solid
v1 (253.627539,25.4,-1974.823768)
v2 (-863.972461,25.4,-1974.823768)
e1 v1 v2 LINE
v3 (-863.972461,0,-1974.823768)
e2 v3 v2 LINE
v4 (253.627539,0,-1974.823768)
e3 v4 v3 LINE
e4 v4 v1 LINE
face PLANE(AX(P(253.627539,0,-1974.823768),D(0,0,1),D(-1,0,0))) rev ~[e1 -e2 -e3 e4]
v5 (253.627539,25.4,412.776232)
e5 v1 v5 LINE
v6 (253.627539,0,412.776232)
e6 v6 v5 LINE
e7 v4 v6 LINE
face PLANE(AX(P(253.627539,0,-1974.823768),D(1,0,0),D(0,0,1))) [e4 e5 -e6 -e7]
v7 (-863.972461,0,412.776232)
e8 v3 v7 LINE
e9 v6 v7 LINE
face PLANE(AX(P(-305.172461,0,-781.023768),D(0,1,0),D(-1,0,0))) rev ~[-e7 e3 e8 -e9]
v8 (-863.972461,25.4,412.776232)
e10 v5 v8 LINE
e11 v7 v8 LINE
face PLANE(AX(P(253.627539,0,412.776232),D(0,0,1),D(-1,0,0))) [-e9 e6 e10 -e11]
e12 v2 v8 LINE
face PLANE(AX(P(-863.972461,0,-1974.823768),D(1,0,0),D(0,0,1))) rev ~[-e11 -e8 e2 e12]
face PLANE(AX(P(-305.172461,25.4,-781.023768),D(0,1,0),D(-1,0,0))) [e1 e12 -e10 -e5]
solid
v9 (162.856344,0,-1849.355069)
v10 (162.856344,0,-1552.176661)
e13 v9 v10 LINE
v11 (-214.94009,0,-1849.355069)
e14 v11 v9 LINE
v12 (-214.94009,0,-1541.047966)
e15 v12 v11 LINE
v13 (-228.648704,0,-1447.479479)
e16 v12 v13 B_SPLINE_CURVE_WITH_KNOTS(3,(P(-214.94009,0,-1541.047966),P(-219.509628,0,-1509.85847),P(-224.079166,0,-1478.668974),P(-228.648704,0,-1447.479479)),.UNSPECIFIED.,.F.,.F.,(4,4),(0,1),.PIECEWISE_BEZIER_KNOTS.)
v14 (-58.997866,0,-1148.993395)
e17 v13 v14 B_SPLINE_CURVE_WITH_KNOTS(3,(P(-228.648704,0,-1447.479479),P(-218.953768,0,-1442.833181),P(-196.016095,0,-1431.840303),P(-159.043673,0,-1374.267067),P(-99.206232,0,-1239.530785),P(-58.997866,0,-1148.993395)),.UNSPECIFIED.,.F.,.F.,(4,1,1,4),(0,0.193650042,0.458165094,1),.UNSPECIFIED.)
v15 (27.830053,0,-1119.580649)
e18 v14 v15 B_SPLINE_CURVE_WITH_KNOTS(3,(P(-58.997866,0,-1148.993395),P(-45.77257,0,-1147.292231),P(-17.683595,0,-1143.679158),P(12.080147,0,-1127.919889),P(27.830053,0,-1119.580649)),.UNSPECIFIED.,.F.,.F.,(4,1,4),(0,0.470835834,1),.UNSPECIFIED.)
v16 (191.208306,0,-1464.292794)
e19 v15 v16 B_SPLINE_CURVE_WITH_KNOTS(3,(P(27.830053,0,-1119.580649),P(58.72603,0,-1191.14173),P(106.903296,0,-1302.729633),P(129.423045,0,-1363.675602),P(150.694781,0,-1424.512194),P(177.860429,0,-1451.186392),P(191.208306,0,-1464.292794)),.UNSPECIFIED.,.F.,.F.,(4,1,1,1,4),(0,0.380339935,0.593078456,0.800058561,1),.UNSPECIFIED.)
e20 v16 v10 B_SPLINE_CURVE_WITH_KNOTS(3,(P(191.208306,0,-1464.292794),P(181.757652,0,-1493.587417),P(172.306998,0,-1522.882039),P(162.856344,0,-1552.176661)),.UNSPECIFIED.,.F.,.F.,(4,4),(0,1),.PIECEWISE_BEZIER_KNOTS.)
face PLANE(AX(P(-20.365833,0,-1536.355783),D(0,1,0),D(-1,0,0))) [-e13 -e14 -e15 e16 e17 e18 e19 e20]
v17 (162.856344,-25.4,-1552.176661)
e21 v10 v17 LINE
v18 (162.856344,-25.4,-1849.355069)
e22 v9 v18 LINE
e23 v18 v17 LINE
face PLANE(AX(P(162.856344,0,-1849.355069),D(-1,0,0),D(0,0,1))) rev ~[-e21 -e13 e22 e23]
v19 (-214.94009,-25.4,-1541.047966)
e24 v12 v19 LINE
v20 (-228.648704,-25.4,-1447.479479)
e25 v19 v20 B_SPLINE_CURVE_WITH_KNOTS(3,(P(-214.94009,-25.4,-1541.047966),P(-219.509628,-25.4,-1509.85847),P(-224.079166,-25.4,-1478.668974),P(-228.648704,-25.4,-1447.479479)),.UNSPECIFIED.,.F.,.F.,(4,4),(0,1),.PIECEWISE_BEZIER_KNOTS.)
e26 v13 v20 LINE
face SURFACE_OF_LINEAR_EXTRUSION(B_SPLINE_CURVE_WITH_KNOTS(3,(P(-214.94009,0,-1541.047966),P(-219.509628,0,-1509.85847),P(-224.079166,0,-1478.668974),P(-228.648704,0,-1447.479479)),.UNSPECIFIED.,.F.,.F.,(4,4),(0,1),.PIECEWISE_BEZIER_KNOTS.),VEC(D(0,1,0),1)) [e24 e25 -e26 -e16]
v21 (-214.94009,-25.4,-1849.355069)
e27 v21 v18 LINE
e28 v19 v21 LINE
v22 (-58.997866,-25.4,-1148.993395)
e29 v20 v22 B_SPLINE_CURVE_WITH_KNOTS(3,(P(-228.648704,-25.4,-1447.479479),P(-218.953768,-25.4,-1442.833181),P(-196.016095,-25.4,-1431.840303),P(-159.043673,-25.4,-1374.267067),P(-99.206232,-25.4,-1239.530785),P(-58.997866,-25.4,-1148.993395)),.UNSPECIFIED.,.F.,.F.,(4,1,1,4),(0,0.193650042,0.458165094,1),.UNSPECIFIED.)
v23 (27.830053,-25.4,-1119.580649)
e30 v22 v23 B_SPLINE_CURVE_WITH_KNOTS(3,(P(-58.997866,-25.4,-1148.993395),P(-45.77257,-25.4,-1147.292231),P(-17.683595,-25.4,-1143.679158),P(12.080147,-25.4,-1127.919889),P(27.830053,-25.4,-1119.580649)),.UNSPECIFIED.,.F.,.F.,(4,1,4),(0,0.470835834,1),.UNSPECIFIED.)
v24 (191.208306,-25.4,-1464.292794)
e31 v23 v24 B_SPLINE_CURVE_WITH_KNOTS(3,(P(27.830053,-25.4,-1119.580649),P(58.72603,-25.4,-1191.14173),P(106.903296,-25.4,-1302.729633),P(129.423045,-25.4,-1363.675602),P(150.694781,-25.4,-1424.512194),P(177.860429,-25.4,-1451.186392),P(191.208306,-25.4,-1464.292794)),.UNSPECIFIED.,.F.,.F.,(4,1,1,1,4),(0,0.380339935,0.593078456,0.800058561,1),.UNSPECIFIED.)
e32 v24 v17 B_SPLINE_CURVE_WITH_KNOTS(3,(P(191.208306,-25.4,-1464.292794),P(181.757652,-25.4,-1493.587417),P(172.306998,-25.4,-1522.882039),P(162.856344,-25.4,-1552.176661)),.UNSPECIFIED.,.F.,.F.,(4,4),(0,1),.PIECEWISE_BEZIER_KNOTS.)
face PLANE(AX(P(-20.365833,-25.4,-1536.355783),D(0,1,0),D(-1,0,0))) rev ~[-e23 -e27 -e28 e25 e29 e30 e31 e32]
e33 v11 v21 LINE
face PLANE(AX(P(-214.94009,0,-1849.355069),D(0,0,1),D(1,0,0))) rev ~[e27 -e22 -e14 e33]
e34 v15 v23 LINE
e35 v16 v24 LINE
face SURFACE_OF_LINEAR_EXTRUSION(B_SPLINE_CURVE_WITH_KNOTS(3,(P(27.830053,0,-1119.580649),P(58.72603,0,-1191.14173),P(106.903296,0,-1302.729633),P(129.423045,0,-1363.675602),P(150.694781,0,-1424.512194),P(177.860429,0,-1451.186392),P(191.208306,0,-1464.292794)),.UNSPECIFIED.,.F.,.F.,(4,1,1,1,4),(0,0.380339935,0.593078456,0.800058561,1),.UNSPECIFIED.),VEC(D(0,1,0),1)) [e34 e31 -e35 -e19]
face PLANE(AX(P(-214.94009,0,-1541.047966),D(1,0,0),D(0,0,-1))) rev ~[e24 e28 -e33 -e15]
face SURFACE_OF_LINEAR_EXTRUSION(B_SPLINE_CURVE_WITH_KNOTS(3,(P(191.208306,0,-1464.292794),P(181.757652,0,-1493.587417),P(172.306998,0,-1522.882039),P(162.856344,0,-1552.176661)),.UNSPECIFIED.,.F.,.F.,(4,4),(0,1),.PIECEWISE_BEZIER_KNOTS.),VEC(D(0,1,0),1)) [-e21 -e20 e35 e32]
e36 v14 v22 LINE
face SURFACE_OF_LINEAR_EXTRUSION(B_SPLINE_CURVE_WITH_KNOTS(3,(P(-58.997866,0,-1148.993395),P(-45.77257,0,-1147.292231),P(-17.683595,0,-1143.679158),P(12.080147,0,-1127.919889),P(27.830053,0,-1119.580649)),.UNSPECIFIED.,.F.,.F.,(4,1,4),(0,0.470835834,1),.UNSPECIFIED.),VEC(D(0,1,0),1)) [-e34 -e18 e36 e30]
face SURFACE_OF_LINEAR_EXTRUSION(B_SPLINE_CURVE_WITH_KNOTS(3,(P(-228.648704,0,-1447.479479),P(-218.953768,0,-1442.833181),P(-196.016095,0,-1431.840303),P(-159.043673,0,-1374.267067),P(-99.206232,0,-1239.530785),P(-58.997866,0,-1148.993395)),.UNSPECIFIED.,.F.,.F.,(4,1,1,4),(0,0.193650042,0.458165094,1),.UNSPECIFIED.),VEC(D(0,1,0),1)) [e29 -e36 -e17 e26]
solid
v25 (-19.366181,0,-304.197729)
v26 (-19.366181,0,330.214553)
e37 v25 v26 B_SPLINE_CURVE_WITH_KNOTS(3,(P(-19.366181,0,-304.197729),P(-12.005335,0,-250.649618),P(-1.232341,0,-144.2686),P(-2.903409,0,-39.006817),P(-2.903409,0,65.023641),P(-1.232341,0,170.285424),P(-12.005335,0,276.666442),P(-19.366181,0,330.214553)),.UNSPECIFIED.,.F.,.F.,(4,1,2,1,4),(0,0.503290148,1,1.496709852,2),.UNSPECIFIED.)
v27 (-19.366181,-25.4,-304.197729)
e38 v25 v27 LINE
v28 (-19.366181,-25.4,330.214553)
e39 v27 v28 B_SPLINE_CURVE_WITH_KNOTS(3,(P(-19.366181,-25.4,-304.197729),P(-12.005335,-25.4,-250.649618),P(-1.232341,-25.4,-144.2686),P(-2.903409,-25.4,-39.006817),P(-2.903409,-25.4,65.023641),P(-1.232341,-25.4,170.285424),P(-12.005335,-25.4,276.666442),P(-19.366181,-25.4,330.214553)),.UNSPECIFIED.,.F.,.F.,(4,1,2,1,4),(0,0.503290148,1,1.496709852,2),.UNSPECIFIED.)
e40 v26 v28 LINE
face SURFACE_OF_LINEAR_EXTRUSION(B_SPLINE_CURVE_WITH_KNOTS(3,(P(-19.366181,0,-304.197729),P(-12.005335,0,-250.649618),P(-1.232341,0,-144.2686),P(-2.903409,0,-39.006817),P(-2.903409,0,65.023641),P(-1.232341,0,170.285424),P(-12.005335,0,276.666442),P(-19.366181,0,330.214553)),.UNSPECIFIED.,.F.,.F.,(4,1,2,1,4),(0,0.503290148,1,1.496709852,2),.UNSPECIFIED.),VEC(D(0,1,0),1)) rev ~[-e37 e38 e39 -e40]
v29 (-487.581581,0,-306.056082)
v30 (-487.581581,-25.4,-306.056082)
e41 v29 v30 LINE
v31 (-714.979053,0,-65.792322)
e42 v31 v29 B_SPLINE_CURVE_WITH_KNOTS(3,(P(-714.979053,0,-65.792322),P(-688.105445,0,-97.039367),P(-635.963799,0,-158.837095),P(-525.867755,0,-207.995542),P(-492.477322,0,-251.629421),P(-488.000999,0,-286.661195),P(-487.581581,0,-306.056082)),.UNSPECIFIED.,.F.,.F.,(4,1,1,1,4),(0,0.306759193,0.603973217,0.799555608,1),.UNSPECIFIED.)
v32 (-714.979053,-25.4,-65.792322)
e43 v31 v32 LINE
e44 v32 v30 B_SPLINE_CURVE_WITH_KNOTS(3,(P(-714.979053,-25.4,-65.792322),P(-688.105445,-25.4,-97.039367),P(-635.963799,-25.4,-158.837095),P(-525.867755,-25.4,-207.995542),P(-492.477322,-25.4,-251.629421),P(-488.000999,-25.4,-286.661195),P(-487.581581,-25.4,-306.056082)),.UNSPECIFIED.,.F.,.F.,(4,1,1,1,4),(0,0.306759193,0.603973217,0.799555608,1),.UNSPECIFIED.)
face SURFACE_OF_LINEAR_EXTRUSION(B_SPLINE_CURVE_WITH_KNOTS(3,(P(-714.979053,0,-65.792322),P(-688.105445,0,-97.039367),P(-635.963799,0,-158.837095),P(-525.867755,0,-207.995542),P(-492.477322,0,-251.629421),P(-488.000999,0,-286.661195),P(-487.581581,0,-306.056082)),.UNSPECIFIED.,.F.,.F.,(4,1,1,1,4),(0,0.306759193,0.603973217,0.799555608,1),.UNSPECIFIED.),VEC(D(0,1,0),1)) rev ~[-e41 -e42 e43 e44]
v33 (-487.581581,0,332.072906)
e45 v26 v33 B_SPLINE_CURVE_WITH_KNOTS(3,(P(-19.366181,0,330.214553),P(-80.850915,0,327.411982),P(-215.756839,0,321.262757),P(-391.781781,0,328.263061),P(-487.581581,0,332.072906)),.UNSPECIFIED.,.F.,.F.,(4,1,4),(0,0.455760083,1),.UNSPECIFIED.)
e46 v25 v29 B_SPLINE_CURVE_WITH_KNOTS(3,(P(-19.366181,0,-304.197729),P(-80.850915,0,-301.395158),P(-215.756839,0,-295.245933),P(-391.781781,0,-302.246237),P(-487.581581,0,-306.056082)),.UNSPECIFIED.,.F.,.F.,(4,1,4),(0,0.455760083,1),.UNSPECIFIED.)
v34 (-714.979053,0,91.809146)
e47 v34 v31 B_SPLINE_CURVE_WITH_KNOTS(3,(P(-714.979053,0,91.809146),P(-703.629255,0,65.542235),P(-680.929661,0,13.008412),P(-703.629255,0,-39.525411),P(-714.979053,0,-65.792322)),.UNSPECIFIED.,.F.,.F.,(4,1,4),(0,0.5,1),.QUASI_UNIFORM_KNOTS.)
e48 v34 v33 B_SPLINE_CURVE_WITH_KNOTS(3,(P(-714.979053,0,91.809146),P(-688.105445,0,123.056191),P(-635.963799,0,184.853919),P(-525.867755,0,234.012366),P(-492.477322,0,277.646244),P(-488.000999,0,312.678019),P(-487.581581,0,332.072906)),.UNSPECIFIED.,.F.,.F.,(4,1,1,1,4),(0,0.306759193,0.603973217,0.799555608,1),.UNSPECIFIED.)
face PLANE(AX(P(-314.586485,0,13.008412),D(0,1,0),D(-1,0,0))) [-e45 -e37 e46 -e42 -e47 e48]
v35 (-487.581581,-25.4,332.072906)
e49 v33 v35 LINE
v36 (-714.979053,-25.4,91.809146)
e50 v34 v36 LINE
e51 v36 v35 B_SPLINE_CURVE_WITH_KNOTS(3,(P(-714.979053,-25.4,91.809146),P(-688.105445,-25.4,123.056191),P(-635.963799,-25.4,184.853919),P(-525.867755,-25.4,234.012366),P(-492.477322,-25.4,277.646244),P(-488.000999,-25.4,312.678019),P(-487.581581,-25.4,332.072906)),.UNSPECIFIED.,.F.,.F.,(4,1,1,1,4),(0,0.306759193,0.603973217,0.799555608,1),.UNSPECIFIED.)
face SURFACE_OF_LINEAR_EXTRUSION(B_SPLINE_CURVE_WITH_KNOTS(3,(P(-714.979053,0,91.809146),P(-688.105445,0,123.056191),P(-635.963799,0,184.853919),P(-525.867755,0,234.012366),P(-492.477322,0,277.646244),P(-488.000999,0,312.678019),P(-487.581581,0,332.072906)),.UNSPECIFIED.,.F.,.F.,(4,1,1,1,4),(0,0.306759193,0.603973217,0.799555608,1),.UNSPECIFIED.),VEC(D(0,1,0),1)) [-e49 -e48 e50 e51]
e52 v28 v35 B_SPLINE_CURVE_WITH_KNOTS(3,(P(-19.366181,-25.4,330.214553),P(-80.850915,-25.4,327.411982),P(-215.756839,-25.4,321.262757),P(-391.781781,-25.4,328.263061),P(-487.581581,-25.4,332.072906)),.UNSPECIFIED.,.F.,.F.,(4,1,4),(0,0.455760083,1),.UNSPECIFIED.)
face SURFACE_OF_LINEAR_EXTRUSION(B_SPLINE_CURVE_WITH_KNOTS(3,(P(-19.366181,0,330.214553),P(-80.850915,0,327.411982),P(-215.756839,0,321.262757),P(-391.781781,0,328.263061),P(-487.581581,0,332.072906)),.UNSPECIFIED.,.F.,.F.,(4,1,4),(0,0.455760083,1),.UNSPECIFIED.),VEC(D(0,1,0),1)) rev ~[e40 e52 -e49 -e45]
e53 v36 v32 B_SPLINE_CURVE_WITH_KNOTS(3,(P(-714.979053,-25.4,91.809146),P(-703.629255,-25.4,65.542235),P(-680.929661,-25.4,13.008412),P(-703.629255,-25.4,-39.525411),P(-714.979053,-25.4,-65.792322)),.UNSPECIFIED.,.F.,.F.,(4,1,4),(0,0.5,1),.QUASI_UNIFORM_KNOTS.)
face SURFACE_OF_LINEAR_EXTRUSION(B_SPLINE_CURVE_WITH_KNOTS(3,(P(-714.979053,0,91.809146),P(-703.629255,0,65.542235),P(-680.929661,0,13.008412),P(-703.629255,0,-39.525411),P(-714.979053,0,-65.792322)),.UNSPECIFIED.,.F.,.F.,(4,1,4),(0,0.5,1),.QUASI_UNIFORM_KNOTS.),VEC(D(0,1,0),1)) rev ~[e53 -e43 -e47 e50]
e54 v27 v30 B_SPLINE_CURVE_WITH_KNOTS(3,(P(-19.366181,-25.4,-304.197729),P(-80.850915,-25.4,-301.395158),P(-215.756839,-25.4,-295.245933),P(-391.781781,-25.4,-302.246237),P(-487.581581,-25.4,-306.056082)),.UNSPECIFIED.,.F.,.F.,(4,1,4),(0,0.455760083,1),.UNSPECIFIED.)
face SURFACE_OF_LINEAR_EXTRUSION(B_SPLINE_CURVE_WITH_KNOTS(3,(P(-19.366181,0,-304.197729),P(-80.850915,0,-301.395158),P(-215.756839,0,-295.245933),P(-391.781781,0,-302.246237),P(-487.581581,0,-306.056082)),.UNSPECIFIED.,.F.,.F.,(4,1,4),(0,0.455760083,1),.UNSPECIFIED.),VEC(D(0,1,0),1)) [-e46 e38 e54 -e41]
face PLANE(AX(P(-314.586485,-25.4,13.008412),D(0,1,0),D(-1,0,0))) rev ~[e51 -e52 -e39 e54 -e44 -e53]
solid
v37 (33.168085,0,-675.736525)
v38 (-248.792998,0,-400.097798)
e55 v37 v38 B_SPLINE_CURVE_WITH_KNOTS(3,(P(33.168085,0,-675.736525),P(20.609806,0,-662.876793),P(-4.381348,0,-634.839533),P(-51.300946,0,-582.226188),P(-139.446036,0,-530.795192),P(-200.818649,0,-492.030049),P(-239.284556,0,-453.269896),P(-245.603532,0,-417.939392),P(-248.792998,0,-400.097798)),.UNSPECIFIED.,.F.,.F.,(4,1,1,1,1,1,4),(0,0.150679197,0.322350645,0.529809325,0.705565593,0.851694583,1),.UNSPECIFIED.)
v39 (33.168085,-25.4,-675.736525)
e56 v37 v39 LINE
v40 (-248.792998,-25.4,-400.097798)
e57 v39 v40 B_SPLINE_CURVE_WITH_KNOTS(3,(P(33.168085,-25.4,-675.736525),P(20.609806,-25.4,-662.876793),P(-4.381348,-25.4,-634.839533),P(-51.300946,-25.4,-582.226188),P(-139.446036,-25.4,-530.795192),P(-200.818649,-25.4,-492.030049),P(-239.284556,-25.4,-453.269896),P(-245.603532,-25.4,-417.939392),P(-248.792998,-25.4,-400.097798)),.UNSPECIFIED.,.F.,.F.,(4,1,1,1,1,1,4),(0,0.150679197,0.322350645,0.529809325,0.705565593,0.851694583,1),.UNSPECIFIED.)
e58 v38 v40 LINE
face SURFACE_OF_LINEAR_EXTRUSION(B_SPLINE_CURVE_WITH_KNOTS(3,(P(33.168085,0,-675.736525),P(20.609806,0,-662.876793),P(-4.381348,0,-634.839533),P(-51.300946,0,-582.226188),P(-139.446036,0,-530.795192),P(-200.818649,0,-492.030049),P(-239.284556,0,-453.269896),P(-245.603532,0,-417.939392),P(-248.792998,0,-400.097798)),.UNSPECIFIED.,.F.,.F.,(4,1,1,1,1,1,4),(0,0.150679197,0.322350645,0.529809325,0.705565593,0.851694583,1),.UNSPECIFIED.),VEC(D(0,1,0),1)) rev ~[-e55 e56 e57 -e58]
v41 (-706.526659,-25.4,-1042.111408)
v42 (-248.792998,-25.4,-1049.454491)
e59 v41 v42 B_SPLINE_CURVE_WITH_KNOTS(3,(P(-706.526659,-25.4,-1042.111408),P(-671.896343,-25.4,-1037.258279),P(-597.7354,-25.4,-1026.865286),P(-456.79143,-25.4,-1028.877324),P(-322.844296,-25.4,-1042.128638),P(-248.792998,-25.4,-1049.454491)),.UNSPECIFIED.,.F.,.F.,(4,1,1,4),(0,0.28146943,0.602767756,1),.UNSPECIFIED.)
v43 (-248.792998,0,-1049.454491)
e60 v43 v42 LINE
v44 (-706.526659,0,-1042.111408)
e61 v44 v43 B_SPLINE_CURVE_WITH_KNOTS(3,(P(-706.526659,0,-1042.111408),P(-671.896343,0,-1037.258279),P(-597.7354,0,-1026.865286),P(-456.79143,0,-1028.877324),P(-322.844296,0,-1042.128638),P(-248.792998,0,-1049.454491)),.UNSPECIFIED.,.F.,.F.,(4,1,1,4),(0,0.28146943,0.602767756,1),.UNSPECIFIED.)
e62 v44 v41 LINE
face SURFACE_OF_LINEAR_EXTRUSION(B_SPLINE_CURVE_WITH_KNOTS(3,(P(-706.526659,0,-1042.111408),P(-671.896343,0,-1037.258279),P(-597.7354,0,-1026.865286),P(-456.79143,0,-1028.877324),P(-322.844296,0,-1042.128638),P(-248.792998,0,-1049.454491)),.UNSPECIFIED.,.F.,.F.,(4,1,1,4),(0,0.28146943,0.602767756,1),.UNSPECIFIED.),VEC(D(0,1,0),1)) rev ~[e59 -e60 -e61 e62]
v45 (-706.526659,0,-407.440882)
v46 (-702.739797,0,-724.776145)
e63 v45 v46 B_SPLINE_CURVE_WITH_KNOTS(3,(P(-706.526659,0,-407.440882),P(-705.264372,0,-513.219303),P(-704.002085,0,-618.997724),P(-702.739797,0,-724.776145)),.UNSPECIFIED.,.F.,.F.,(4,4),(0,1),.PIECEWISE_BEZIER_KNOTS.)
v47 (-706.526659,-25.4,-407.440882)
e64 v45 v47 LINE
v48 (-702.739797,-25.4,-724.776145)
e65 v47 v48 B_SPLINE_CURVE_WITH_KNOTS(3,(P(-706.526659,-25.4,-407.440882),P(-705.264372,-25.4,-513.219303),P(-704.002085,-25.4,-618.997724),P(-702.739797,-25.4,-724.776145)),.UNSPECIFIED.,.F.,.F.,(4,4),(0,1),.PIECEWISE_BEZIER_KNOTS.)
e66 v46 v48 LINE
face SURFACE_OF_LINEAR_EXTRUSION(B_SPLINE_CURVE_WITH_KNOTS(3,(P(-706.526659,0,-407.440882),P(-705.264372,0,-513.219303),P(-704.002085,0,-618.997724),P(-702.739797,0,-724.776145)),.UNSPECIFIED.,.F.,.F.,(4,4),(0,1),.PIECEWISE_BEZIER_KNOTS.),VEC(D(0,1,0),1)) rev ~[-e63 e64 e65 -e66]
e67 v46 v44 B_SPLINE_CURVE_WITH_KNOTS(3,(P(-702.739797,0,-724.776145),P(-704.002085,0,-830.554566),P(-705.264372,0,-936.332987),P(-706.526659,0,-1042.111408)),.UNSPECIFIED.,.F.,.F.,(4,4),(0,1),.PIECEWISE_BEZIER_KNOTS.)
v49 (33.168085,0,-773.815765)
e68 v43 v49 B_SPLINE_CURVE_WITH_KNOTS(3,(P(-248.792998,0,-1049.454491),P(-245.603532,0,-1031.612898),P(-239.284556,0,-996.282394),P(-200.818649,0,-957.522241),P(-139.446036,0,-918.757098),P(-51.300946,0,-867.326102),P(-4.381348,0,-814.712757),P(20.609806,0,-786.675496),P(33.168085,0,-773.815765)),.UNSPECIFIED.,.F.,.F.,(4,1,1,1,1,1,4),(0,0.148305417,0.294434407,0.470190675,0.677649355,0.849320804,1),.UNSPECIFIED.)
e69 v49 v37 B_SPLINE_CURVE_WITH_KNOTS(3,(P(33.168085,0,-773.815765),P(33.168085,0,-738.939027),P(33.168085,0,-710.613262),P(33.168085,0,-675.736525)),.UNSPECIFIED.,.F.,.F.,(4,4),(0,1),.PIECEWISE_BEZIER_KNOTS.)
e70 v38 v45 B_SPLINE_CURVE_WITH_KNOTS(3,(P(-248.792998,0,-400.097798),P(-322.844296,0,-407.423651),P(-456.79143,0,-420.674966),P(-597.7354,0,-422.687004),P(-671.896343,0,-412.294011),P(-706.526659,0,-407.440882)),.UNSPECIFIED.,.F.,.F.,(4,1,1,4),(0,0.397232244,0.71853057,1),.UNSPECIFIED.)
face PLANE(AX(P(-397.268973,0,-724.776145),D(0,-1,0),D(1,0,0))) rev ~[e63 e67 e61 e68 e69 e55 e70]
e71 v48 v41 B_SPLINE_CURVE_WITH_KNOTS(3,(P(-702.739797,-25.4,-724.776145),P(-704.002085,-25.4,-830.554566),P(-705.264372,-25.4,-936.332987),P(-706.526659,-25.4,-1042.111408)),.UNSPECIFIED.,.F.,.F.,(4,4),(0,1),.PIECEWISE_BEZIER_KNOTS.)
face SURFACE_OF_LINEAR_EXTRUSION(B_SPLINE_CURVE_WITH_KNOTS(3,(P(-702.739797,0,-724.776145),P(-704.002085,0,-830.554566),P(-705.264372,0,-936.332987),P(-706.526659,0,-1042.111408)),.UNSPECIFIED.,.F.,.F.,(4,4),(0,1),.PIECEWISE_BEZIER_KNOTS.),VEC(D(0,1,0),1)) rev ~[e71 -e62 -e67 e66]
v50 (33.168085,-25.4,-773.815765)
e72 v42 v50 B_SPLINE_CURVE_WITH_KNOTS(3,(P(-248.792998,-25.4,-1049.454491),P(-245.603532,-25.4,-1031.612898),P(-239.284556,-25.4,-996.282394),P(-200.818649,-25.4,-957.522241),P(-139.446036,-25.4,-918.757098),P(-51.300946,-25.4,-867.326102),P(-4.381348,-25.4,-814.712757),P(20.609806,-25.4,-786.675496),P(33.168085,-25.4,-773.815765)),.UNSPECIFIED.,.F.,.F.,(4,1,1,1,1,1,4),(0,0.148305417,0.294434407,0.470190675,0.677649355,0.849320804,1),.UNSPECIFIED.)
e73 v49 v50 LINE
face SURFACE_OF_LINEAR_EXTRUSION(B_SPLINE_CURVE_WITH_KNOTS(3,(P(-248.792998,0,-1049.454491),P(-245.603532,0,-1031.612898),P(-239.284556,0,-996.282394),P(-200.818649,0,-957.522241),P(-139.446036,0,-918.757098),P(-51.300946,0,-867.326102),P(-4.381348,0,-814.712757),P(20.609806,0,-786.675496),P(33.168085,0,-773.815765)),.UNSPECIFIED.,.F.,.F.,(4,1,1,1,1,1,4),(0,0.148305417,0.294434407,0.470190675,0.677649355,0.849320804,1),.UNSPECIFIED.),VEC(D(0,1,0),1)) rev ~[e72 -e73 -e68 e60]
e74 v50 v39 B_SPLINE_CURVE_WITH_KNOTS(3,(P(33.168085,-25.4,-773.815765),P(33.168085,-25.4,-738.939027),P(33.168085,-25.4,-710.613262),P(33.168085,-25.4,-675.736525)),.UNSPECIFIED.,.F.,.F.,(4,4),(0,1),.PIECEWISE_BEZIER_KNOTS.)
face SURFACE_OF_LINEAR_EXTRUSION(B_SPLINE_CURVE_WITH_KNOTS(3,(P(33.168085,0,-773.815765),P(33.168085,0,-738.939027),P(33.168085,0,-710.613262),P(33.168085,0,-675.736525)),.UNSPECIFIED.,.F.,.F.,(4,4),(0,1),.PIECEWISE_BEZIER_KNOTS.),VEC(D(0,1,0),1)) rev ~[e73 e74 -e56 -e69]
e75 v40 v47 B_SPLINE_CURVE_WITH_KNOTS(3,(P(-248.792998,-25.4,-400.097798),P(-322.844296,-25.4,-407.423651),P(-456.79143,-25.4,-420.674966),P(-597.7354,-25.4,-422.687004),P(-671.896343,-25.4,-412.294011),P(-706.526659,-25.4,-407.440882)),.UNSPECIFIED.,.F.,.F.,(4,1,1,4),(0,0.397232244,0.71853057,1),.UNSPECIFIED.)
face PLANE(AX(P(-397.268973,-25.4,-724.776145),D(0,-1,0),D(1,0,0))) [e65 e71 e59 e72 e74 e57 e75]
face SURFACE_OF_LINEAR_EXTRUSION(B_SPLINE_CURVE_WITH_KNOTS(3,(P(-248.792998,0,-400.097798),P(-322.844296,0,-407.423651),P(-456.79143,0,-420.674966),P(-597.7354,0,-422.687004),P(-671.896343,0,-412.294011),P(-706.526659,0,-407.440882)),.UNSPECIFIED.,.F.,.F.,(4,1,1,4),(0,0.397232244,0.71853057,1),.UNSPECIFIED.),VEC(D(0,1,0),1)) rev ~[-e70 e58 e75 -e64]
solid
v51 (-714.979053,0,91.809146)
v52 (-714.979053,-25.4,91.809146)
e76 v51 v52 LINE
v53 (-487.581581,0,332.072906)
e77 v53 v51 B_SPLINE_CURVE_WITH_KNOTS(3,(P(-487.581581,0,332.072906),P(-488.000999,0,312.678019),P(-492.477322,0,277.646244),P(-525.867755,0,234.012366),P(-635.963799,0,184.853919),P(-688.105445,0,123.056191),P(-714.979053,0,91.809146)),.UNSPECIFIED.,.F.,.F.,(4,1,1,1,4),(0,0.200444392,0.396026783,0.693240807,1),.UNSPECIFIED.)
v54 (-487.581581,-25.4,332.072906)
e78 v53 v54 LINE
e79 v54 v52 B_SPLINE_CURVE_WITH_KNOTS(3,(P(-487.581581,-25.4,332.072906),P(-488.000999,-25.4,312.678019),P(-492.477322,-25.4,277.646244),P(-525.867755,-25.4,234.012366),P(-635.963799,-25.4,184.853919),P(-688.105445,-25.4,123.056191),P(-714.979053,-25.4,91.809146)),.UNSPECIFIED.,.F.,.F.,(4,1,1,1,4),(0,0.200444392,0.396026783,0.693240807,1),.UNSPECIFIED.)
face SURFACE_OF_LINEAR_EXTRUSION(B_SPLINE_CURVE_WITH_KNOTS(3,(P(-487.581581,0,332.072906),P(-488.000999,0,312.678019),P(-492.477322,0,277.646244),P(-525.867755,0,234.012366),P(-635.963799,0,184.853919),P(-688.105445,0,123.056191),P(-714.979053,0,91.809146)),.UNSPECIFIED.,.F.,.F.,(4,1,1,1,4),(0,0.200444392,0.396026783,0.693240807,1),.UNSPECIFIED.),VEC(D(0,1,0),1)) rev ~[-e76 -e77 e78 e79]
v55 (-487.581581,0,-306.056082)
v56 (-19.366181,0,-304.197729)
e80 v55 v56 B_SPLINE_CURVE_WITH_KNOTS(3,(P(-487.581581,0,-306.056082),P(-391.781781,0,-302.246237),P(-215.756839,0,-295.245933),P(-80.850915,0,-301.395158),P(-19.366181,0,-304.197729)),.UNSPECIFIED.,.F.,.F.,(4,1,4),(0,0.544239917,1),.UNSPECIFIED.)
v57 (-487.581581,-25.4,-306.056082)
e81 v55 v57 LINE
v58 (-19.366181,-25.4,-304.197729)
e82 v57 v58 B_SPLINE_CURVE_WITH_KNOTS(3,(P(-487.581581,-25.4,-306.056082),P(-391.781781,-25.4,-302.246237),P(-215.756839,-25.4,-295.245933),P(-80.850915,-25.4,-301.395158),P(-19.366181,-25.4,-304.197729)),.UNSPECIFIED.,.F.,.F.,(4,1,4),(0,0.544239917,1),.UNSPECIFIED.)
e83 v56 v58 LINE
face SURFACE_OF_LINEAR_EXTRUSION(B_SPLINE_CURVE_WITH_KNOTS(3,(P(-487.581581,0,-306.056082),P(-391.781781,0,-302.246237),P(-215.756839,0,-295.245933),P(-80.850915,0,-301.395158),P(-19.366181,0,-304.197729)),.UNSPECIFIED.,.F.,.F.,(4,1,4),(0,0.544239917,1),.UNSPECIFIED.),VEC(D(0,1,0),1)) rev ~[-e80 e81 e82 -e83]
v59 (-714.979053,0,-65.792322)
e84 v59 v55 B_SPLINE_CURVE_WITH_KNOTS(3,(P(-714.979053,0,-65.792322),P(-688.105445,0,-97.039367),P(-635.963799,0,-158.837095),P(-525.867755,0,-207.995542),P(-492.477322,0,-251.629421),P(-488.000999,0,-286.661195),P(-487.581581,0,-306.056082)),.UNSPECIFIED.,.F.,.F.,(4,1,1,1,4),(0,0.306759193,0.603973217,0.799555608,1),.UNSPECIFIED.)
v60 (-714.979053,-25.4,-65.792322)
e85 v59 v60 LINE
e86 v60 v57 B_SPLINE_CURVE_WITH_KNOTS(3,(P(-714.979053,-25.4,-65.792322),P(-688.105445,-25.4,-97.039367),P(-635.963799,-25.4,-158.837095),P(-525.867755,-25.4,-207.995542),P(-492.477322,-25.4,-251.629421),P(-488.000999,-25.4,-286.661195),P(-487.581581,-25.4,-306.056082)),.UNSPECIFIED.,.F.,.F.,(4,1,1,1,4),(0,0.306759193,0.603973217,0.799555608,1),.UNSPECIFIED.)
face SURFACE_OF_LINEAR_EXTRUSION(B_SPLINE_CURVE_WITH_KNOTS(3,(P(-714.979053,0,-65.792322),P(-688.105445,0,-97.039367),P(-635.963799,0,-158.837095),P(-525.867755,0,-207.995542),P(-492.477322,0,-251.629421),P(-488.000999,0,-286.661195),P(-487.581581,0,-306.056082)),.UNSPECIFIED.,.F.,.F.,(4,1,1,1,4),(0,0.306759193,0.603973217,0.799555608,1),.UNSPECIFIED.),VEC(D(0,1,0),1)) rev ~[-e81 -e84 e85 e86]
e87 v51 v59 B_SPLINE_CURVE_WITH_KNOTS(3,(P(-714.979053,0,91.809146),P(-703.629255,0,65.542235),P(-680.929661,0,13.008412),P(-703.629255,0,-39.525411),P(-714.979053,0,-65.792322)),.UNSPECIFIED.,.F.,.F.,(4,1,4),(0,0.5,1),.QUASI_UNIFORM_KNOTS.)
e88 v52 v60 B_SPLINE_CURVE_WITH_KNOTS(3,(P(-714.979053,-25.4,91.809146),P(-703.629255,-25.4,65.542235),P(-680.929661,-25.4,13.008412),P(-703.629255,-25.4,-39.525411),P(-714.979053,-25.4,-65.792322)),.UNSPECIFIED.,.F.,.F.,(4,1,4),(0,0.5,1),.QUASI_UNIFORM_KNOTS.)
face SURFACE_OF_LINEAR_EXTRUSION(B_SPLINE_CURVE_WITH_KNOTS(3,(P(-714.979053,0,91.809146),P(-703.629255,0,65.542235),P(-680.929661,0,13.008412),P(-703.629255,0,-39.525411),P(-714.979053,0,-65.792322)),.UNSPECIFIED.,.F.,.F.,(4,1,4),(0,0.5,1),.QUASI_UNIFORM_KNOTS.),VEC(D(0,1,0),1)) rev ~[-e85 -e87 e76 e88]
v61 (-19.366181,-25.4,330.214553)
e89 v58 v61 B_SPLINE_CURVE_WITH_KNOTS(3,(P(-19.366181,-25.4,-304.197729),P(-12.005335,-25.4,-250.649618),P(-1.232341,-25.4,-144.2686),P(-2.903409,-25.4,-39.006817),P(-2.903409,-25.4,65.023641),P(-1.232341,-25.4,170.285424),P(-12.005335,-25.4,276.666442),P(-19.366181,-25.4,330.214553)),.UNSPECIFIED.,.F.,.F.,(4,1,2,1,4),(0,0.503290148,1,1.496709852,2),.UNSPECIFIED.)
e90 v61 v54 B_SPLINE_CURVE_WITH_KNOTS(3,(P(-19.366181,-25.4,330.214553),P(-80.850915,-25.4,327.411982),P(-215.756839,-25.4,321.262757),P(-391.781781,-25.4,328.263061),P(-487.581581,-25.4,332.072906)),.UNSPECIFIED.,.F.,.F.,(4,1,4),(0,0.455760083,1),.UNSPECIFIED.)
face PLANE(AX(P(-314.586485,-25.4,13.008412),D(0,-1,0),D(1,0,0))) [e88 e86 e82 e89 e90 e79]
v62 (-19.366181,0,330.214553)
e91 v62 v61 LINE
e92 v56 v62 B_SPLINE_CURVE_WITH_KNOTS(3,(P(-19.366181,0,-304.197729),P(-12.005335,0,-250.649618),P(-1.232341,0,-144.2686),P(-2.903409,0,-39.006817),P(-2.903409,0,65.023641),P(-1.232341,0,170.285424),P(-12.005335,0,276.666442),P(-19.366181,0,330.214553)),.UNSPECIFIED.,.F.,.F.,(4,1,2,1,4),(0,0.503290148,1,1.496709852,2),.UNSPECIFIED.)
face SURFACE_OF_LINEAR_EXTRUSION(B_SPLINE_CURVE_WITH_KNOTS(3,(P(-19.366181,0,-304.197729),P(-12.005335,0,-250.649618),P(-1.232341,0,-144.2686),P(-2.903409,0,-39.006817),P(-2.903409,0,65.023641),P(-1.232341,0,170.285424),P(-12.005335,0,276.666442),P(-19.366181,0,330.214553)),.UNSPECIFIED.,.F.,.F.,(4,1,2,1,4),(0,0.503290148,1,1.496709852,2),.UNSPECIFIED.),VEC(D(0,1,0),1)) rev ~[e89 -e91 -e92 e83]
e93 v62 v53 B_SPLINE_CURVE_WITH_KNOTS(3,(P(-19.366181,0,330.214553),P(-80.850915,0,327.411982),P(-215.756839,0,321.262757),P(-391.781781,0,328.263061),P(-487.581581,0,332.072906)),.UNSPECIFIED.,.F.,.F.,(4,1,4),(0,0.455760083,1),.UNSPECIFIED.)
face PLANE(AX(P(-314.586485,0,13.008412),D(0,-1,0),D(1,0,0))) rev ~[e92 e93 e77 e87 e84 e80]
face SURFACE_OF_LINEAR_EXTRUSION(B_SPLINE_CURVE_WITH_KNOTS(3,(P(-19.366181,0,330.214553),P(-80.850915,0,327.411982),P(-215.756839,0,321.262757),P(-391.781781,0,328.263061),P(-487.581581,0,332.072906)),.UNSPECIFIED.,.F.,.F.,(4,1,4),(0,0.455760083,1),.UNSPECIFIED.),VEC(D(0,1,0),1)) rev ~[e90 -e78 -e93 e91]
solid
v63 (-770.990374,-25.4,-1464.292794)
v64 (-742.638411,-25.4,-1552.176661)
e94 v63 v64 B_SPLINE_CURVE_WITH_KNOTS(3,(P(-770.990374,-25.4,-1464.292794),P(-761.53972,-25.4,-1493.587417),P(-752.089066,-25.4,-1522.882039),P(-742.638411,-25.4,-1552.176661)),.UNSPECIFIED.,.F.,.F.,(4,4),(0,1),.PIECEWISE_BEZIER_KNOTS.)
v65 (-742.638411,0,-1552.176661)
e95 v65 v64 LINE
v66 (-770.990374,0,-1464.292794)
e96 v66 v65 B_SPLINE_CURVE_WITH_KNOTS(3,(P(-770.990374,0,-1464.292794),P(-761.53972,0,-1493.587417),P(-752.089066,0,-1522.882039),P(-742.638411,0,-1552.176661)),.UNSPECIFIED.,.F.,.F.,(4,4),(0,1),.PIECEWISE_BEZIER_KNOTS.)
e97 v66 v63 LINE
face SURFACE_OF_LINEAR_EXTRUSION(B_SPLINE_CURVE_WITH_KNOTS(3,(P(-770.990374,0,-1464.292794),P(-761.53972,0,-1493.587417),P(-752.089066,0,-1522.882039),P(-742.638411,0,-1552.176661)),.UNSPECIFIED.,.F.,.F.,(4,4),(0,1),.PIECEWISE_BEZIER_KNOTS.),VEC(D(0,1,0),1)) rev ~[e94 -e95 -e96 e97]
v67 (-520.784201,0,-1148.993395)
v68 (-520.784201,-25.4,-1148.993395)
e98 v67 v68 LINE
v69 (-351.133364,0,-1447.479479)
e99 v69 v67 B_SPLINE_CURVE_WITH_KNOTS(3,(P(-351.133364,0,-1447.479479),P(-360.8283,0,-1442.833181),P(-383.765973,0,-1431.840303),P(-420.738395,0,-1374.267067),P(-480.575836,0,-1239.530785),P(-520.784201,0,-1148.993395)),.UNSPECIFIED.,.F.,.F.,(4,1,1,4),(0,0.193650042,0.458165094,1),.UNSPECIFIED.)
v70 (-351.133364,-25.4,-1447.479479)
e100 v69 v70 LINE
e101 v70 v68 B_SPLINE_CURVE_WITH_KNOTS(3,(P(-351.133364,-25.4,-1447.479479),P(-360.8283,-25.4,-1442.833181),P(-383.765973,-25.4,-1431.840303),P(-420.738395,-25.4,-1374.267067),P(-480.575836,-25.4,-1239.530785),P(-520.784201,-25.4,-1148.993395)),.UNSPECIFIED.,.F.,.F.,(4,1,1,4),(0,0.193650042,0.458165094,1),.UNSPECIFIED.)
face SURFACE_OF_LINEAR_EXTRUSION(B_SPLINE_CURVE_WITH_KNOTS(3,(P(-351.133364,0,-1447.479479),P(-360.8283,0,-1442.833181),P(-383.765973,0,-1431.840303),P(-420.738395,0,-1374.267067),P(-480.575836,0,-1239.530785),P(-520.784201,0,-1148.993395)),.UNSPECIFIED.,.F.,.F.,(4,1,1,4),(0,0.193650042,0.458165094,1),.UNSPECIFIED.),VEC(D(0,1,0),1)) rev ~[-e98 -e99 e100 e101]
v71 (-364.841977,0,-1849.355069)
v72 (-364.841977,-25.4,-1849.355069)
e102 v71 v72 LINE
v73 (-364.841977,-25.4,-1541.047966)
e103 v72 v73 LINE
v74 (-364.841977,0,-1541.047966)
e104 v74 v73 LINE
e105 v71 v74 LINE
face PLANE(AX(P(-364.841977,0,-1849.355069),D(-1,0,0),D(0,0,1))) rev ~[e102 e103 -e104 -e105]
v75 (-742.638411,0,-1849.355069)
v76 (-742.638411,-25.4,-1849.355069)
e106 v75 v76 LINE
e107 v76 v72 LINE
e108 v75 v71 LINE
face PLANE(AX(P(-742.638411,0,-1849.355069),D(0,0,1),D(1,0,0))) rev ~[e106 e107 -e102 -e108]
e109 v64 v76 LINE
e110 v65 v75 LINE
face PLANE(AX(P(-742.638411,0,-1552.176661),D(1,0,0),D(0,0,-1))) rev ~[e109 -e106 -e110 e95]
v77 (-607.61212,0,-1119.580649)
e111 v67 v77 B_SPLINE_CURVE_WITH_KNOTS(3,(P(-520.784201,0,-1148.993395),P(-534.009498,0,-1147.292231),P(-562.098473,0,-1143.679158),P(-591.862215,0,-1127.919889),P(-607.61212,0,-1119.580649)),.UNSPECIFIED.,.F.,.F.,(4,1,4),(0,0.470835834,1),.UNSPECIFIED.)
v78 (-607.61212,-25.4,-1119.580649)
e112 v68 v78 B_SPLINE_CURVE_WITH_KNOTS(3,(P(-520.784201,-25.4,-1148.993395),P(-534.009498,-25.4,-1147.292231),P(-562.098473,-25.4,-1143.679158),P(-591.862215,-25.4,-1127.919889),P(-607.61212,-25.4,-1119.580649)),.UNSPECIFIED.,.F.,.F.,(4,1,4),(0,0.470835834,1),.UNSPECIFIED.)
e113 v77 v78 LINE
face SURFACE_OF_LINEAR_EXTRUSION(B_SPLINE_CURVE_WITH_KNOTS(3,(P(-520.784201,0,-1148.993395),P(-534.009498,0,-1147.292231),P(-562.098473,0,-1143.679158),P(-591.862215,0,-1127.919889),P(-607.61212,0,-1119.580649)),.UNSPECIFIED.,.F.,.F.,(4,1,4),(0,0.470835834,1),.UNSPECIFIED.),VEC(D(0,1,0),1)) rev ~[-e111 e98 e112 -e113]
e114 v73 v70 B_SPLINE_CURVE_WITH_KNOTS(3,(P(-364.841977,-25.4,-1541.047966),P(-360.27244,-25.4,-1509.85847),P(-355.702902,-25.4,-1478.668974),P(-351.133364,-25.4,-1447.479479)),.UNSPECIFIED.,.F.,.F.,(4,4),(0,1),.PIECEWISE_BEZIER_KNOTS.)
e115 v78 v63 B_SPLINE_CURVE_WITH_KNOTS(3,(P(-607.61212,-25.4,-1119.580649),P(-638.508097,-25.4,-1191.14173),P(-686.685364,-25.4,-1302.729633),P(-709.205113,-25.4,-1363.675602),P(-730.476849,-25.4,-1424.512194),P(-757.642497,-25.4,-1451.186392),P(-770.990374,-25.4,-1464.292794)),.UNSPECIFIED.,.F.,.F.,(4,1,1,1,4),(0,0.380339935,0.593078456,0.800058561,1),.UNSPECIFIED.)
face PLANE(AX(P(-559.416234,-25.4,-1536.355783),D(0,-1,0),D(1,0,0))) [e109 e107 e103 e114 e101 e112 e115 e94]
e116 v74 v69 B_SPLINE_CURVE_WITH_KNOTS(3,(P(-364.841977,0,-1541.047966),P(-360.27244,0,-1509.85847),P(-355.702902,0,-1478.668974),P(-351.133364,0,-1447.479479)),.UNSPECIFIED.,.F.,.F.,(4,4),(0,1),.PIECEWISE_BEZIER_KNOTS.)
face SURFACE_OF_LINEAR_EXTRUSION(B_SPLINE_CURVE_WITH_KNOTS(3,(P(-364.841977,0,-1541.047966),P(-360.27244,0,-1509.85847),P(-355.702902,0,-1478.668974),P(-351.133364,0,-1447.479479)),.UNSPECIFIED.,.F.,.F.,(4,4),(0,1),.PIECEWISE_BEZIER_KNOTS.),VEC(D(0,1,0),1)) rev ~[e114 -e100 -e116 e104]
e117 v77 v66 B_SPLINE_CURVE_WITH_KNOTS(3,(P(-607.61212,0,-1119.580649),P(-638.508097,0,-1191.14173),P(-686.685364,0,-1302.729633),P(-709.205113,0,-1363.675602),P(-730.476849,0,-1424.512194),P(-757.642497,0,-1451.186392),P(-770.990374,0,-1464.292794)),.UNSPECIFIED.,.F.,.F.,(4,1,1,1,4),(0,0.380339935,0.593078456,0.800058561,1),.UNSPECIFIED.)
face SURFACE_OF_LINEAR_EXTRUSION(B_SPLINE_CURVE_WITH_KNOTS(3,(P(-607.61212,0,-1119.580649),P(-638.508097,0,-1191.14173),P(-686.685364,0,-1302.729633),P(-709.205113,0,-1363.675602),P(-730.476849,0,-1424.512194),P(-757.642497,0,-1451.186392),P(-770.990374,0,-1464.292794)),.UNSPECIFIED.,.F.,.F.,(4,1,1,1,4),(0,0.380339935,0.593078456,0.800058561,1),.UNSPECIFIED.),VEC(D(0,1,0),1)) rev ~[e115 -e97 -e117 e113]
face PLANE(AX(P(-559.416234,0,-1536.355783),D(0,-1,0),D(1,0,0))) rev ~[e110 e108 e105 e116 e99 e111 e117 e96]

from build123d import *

# Parameters (mm, degrees)
F2_DEPTH = 25.4
F3_W     = 1117.6
F3_H     = 2387.6
F4_DEPTH = 25.4


# Not quite as in the source:
# - the dataset's text gives a spline's control points without its knots; the knots are read off the source's solid


with BuildPart() as f2:
    # F0 (on Front) → F2 (new body)
    with BuildSketch(Plane.XZ):
        with BuildLine():
            add(Edge.make_bspline(
                [(-19.3661805242, -304.1977286339), (-80.8509153389, -301.3951576074), (-215.7568387903, -295.2459331942), (-391.7817809144, -302.2462373132), (-487.5815808773, -306.0560822487)],
                knots=[0, 0, 0, 0, 0.4557600826, 1, 1, 1, 1], degree=3))
            add(Edge.make_bspline(
                [(-19.3661805242, -304.1977286339), (-12.0053351624, -250.6496178417), (-1.2323408104, -144.2686003565), (-2.9034086037, -39.0068169321), (-2.9034086037, 13.0084119737)],
                knots=[0, 0, 0, 0, 0.5032901479, 1, 1, 1, 1], degree=3))
            add(Edge.make_bspline(
                [(-19.3661805242, 330.2145525813), (-12.0053351624, 276.6664417891), (-1.2323408104, 170.2854243039), (-2.9034086037, 65.0236408795), (-2.9034086037, 13.0084119737)],
                knots=[0, 0, 0, 0, 0.5032901479, 1, 1, 1, 1], degree=3))
            add(Edge.make_bspline(
                [(-19.3661805242, 330.2145525813), (-80.8509153389, 327.4119815549), (-215.7568387903, 321.2627571417), (-391.7817809144, 328.2630612606), (-487.5815808773, 332.0729061961)],
                knots=[0, 0, 0, 0, 0.4557600826, 1, 1, 1, 1], degree=3))
            add(Edge.make_bspline(
                [(-714.9790525436, 91.8091461062), (-688.1054453065, 123.0561909313), (-635.963798658, 184.8539191183), (-525.8677553528, 234.0123661327), (-492.4773215799, 277.6462444761), (-488.000998717, 312.6780187869), (-487.5815808773, 332.0729061961)],
                knots=[0, 0, 0, 0, 0.3067591927, 0.6039732165, 0.7995556084, 1, 1, 1, 1], degree=3))
            add(Edge.make_bspline(
                [(-714.9790525436, 91.8091461062), (-703.6292552948, 65.5422347287), (-680.9296607971, 13.0084119737), (-703.6292552948, -39.5254107813), (-714.9790525436, -65.7923221588)],
                knots=[0, 0, 0, 0, 0.5, 1, 1, 1, 1], degree=3))
            add(Edge.make_bspline(
                [(-714.9790525436, -65.7923221588), (-688.1054453065, -97.0393669839), (-635.963798658, -158.8370951708), (-525.8677553528, -207.9955421852), (-492.4773215799, -251.6294205287), (-488.000998717, -286.6611948395), (-487.5815808773, -306.0560822487)],
                knots=[0, 0, 0, 0, 0.3067591927, 0.6039732165, 0.7995556084, 1, 1, 1, 1], degree=3))
        make_face()
    extrude(amount=F2_DEPTH)


with BuildPart() as f2b:
    # F1 (on Front) → F2, piece 2 (new body)
    with BuildSketch(Plane.XZ):
        with BuildLine():
            add(Edge.make_bspline(
                [(-228.6487041344, -1447.4794787136), (-218.9537680176, -1442.8331811079), (-196.0160951189, -1431.8403026208), (-159.0436729676, -1374.2670672458), (-99.2062321703, -1239.5307850908), (-58.9978663553, -1148.9933949677)],
                knots=[0, 0, 0, 0, 0.1936500421, 0.4581650944, 1, 1, 1, 1], degree=3))
            add(Edge.make_bspline(
                [(-214.9400903215, -1541.0479658065), (-219.5096282591, -1509.8584701089), (-224.0791661967, -1478.6689744113), (-228.6487041344, -1447.4794787136)],
                knots=[0, 0, 0, 0, 1, 1, 1, 1], degree=3))
            Line((-214.9400903215, -1541.0479658065), (-214.9400903215, -1849.3550693843))
            Line((-214.9400903215, -1849.3550693843), (162.8563435446, -1849.3550693843))
            Line((162.8563435446, -1849.3550693843), (162.8563435446, -1552.1766614882))
            add(Edge.make_bspline(
                [(191.2083061109, -1464.2927941648), (181.7576519221, -1493.5874166059), (172.3069977334, -1522.8820390471), (162.8563435446, -1552.1766614882)],
                knots=[0, 0, 0, 0, 1, 1, 1, 1], degree=3))
            add(Edge.make_bspline(
                [(27.8300525318, -1119.5806485382), (58.7260295475, -1191.1417299957), (106.9032959188, -1302.7296328945), (129.4230449419, -1363.6756023524), (150.6947810894, -1424.5121938967), (177.8604290666, -1451.1863917758), (191.2083061109, -1464.2927941648)],
                knots=[0, 0, 0, 0, 0.3803399346, 0.5930784559, 0.8000585614, 1, 1, 1, 1], degree=3))
            add(Edge.make_bspline(
                [(-58.9978663553, -1148.9933949677), (-45.7725702422, -1147.2922309278), (-17.6835949522, -1143.679158353), (12.0801469027, -1127.9198891038), (27.8300525318, -1119.5806485382)],
                knots=[0, 0, 0, 0, 0.4708358342, 1, 1, 1, 1], degree=3))
        make_face()
    extrude(amount=F2_DEPTH)


with BuildPart() as f2c:
    # F1 (on Front) → F2, piece 3 (new body)
    with BuildSketch(Plane.XZ):
        with BuildLine():
            Line((-364.8419774692, -1849.3550693843), (-364.8419774692, -1541.0479658065))
            add(Edge.make_bspline(
                [(-364.8419774692, -1541.0479658065), (-360.2724395316, -1509.8584701089), (-355.7029015939, -1478.6689744113), (-351.1333636563, -1447.4794787136)],
                knots=[0, 0, 0, 0, 1, 1, 1, 1], degree=3))
            add(Edge.make_bspline(
                [(-351.1333636563, -1447.4794787136), (-360.8282997731, -1442.8331811079), (-383.7659726718, -1431.8403026208), (-420.7383948231, -1374.2670672458), (-480.5758356204, -1239.5307850908), (-520.7842014354, -1148.9933949677)],
                knots=[0, 0, 0, 0, 0.1936500421, 0.4581650944, 1, 1, 1, 1], degree=3))
            add(Edge.make_bspline(
                [(-520.7842014354, -1148.9933949677), (-534.0094975485, -1147.2922309278), (-562.0984728385, -1143.679158353), (-591.8622146934, -1127.9198891038), (-607.6121203225, -1119.5806485382)],
                knots=[0, 0, 0, 0, 0.4708358342, 1, 1, 1, 1], degree=3))
            add(Edge.make_bspline(
                [(-607.6121203225, -1119.5806485382), (-638.5080973382, -1191.1417299957), (-686.6853637095, -1302.7296328945), (-709.2051127326, -1363.6756023524), (-730.4768488801, -1424.5121938967), (-757.6424968573, -1451.1863917758), (-770.9903739016, -1464.2927941648)],
                knots=[0, 0, 0, 0, 0.3803399346, 0.5930784559, 0.8000585614, 1, 1, 1, 1], degree=3))
            add(Edge.make_bspline(
                [(-770.9903739016, -1464.2927941648), (-761.5397197128, -1493.5874166059), (-752.089065524, -1522.8820390471), (-742.6384113353, -1552.1766614882)],
                knots=[0, 0, 0, 0, 1, 1, 1, 1], degree=3))
            Line((-742.6384113353, -1552.1766614882), (-742.6384113353, -1849.3550693843))
            Line((-742.6384113353, -1849.3550693843), (-364.8419774692, -1849.3550693843))
        make_face()
    extrude(amount=F2_DEPTH)


with BuildPart() as f2d:
    # F1 (on Front) → F2, piece 4 (new body)
    with BuildSketch(Plane.XZ):
        with BuildLine():
            add(Edge.make_bspline(
                [(-19.3661805242, 330.2145525813), (-80.8509153389, 327.4119815549), (-215.7568387903, 321.2627571417), (-391.7817809144, 328.2630612606), (-487.5815808773, 332.0729061961)],
                knots=[0, 0, 0, 0, 0.4557600826, 1, 1, 1, 1], degree=3))
            add(Edge.make_bspline(
                [(-487.5815808773, 332.0729061961), (-488.000998717, 312.6780187869), (-492.4773215799, 277.6462444761), (-525.8677553528, 234.0123661327), (-635.963798658, 184.8539191183), (-688.1054453065, 123.0561909313), (-714.9790525436, 91.8091461062)],
                knots=[0, 0, 0, 0, 0.2004443916, 0.3960267835, 0.6932408073, 1, 1, 1, 1], degree=3))
            add(Edge.make_bspline(
                [(-714.9790525436, 91.8091461062), (-703.6292552948, 65.5422347287), (-680.9296607971, 13.0084119737), (-703.6292552948, -39.5254107813), (-714.9790525436, -65.7923221588)],
                knots=[0, 0, 0, 0, 0.5, 1, 1, 1, 1], degree=3))
            add(Edge.make_bspline(
                [(-714.9790525436, -65.7923221588), (-688.1054453065, -97.0393669839), (-635.963798658, -158.8370951708), (-525.8677553528, -207.9955421852), (-492.4773215799, -251.6294205287), (-488.000998717, -286.6611948395), (-487.5815808773, -306.0560822487)],
                knots=[0, 0, 0, 0, 0.3067591927, 0.6039732165, 0.7995556084, 1, 1, 1, 1], degree=3))
            add(Edge.make_bspline(
                [(-487.5815808773, -306.0560822487), (-391.7817809144, -302.2462373132), (-215.7568387903, -295.2459331942), (-80.8509153389, -301.3951576074), (-19.3661805242, -304.1977286339)],
                knots=[0, 0, 0, 0, 0.5442399174, 1, 1, 1, 1], degree=3))
            add(Edge.make_bspline(
                [(-19.3661805242, -304.1977286339), (-12.0053351624, -250.6496178417), (-1.2323408104, -144.2686003565), (-2.9034086037, -39.0068169321), (-2.9034086037, 13.0084119737)],
                knots=[0, 0, 0, 0, 0.5032901479, 1, 1, 1, 1], degree=3))
            add(Edge.make_bspline(
                [(-2.9034086037, 13.0084119737), (-2.9034086037, 65.0236408795), (-1.2323408104, 170.2854243039), (-12.0053351624, 276.6664417891), (-19.3661805242, 330.2145525813)],
                knots=[0, 0, 0, 0, 0.4967098521, 1, 1, 1, 1], degree=3))
        make_face()
    extrude(amount=F2_DEPTH)


with BuildPart() as f2e:
    # F1 (on Front) → F2, piece 5 (new body)
    with BuildSketch(Plane.XZ):
        with BuildLine():
            add(Edge.make_bspline(
                [(33.1680851389, -773.8157648911), (33.1680851389, -738.939027458), (33.1680851389, -710.6132623747), (33.1680851389, -675.7365249416)],
                knots=[0, 0, 0, 0, 1, 1, 1, 1], degree=3))
            add(Edge.make_bspline(
                [(33.1680851389, -675.7365249416), (20.6098061512, -662.8767934516), (-4.3813482561, -634.8395333098), (-51.3009460882, -582.2261877467), (-139.4460358283, -530.7951922079), (-200.8186488979, -492.0300492954), (-239.2845563093, -453.2698961725), (-245.6035321453, -417.9393915327), (-248.7929982733, -400.0977984016)],
                knots=[0, 0, 0, 0, 0.1506791965, 0.322350645, 0.5298093251, 0.7055655926, 0.8516945833, 1, 1, 1, 1], degree=3))
            add(Edge.make_bspline(
                [(-248.7929982733, -400.0977984016), (-322.8442956619, -407.4236513718), (-456.7914302975, -420.6749656462), (-597.7353998354, -422.6870039331), (-671.8963425102, -412.2940111542), (-706.5266592097, -407.4408820217)],
                knots=[0, 0, 0, 0, 0.3972322443, 0.7185305698, 1, 1, 1, 1], degree=3))
            add(Edge.make_bspline(
                [(-706.5266592097, -407.4408820217), (-705.2643719108, -513.2193029866), (-704.002084612, -618.9977239515), (-702.7397973131, -724.7761449163)],
                knots=[0, 0, 0, 0, 1, 1, 1, 1], degree=3))
            add(Edge.make_bspline(
                [(-702.7397973131, -724.7761449163), (-704.002084612, -830.5545658812), (-705.2643719108, -936.3329868461), (-706.5266592097, -1042.111407811)],
                knots=[0, 0, 0, 0, 1, 1, 1, 1], degree=3))
            add(Edge.make_bspline(
                [(-706.5266592097, -1042.111407811), (-671.8963425102, -1037.2582786785), (-597.7353998354, -1026.8652858996), (-456.7914302975, -1028.8773241865), (-322.8442956619, -1042.1286384609), (-248.7929982733, -1049.4544914311)],
                knots=[0, 0, 0, 0, 0.2814694302, 0.6027677557, 1, 1, 1, 1], degree=3))
            add(Edge.make_bspline(
                [(-248.7929982733, -1049.4544914311), (-245.6035321453, -1031.6128982999), (-239.2845563093, -996.2823936602), (-200.8186488979, -957.5222405373), (-139.4460358283, -918.7570976248), (-51.3009460882, -867.326102086), (-4.3813482561, -814.7127565229), (20.6098061512, -786.6754963811), (33.1680851389, -773.8157648911)],
                knots=[0, 0, 0, 0, 0.1483054167, 0.2944344074, 0.4701906749, 0.677649355, 0.8493208035, 1, 1, 1, 1], degree=3))
        make_face()
    extrude(amount=F2_DEPTH)


with BuildPart() as f4:
    # F3 (on face) → F4 (new body)
    with BuildSketch(Plane(origin=(0, 0, 0), x_dir=(-1, 0, 0), z_dir=(0, 1, 0))):
        with Locations((305.172461319, -781.0237682343)):
            Rectangle(F3_W, F3_H)
        with BuildLine():
            add(Edge.make_bspline(
                [(19.3661805242, -304.1977286339), (12.0053351624, -250.6496178417), (1.2323408104, -144.2686003565), (2.9034086037, -39.0068169321), (2.9034086037, 13.0084119737)],
                knots=[0, 0, 0, 0, 0.5032901479, 1, 1, 1, 1], degree=3))
            add(Edge.make_bspline(
                [(2.9034086037, 13.0084119737), (2.9034086037, 65.0236408795), (1.2323408104, 170.2854243039), (12.0053351624, 276.6664417891), (19.3661805242, 330.2145525813)],
                knots=[0, 0, 0, 0, 0.4967098521, 1, 1, 1, 1], degree=3))
            add(Edge.make_bspline(
                [(19.3661805242, 330.2145525813), (80.8509153389, 327.4119815549), (215.7568387903, 321.2627571417), (391.7817809144, 328.2630612606), (487.5815808773, 332.0729061961)],
                knots=[0, 0, 0, 0, 0.4557600826, 1, 1, 1, 1], degree=3))
            add(Edge.make_bspline(
                [(487.5815808773, 332.0729061961), (488.000998717, 312.6780187869), (492.4773215799, 277.6462444761), (525.8677553528, 234.0123661327), (635.963798658, 184.8539191183), (688.1054453065, 123.0561909313), (714.9790525436, 91.8091461062)],
                knots=[0, 0, 0, 0, 0.2004443916, 0.3960267835, 0.6932408073, 1, 1, 1, 1], degree=3))
            add(Edge.make_bspline(
                [(714.9790525436, 91.8091461062), (703.6292552948, 65.5422347287), (680.9296607971, 13.0084119737), (703.6292552948, -39.5254107813), (714.9790525436, -65.7923221588)],
                knots=[0, 0, 0, 0, 0.5, 1, 1, 1, 1], degree=3))
            add(Edge.make_bspline(
                [(714.9790525436, -65.7923221588), (688.1054453065, -97.0393669839), (635.963798658, -158.8370951708), (525.8677553528, -207.9955421852), (492.4773215799, -251.6294205287), (488.000998717, -286.6611948395), (487.5815808773, -306.0560822487)],
                knots=[0, 0, 0, 0, 0.3067591927, 0.6039732165, 0.7995556084, 1, 1, 1, 1], degree=3))
            add(Edge.make_bspline(
                [(487.5815808773, -306.0560822487), (391.7817809144, -302.2462373132), (215.7568387903, -295.2459331942), (80.8509153389, -301.3951576074), (19.3661805242, -304.1977286339)],
                knots=[0, 0, 0, 0, 0.5442399174, 1, 1, 1, 1], degree=3))
        make_face(mode=Mode.SUBTRACT)
        with BuildLine():
            add(Edge.make_bspline(
                [(2.9034086037, 13.0084119737), (2.9034086037, 65.0236408795), (1.2323408104, 170.2854243039), (12.0053351624, 276.6664417891), (19.3661805242, 330.2145525813)],
                knots=[0, 0, 0, 0, 0.4967098521, 1, 1, 1, 1], degree=3))
            add(Edge.make_bspline(
                [(19.3661805242, -304.1977286339), (12.0053351624, -250.6496178417), (1.2323408104, -144.2686003565), (2.9034086037, -39.0068169321), (2.9034086037, 13.0084119737)],
                knots=[0, 0, 0, 0, 0.5032901479, 1, 1, 1, 1], degree=3))
            add(Edge.make_bspline(
                [(487.5815808773, -306.0560822487), (391.7817809144, -302.2462373132), (215.7568387903, -295.2459331942), (80.8509153389, -301.3951576074), (19.3661805242, -304.1977286339)],
                knots=[0, 0, 0, 0, 0.5442399174, 1, 1, 1, 1], degree=3))
            add(Edge.make_bspline(
                [(714.9790525436, -65.7923221588), (688.1054453065, -97.0393669839), (635.963798658, -158.8370951708), (525.8677553528, -207.9955421852), (492.4773215799, -251.6294205287), (488.000998717, -286.6611948395), (487.5815808773, -306.0560822487)],
                knots=[0, 0, 0, 0, 0.3067591927, 0.6039732165, 0.7995556084, 1, 1, 1, 1], degree=3))
            add(Edge.make_bspline(
                [(714.9790525436, 91.8091461062), (703.6292552948, 65.5422347287), (680.9296607971, 13.0084119737), (703.6292552948, -39.5254107813), (714.9790525436, -65.7923221588)],
                knots=[0, 0, 0, 0, 0.5, 1, 1, 1, 1], degree=3))
            add(Edge.make_bspline(
                [(487.5815808773, 332.0729061961), (488.000998717, 312.6780187869), (492.4773215799, 277.6462444761), (525.8677553528, 234.0123661327), (635.963798658, 184.8539191183), (688.1054453065, 123.0561909313), (714.9790525436, 91.8091461062)],
                knots=[0, 0, 0, 0, 0.2004443916, 0.3960267835, 0.6932408073, 1, 1, 1, 1], degree=3))
            add(Edge.make_bspline(
                [(19.3661805242, 330.2145525813), (80.8509153389, 327.4119815549), (215.7568387903, 321.2627571417), (391.7817809144, 328.2630612606), (487.5815808773, 332.0729061961)],
                knots=[0, 0, 0, 0, 0.4557600826, 1, 1, 1, 1], degree=3))
        make_face()
    extrude(amount=F4_DEPTH)


solid = Compound([f2.part, f2b.part, f2c.part, f2d.part, f2e.part, f4.part])
